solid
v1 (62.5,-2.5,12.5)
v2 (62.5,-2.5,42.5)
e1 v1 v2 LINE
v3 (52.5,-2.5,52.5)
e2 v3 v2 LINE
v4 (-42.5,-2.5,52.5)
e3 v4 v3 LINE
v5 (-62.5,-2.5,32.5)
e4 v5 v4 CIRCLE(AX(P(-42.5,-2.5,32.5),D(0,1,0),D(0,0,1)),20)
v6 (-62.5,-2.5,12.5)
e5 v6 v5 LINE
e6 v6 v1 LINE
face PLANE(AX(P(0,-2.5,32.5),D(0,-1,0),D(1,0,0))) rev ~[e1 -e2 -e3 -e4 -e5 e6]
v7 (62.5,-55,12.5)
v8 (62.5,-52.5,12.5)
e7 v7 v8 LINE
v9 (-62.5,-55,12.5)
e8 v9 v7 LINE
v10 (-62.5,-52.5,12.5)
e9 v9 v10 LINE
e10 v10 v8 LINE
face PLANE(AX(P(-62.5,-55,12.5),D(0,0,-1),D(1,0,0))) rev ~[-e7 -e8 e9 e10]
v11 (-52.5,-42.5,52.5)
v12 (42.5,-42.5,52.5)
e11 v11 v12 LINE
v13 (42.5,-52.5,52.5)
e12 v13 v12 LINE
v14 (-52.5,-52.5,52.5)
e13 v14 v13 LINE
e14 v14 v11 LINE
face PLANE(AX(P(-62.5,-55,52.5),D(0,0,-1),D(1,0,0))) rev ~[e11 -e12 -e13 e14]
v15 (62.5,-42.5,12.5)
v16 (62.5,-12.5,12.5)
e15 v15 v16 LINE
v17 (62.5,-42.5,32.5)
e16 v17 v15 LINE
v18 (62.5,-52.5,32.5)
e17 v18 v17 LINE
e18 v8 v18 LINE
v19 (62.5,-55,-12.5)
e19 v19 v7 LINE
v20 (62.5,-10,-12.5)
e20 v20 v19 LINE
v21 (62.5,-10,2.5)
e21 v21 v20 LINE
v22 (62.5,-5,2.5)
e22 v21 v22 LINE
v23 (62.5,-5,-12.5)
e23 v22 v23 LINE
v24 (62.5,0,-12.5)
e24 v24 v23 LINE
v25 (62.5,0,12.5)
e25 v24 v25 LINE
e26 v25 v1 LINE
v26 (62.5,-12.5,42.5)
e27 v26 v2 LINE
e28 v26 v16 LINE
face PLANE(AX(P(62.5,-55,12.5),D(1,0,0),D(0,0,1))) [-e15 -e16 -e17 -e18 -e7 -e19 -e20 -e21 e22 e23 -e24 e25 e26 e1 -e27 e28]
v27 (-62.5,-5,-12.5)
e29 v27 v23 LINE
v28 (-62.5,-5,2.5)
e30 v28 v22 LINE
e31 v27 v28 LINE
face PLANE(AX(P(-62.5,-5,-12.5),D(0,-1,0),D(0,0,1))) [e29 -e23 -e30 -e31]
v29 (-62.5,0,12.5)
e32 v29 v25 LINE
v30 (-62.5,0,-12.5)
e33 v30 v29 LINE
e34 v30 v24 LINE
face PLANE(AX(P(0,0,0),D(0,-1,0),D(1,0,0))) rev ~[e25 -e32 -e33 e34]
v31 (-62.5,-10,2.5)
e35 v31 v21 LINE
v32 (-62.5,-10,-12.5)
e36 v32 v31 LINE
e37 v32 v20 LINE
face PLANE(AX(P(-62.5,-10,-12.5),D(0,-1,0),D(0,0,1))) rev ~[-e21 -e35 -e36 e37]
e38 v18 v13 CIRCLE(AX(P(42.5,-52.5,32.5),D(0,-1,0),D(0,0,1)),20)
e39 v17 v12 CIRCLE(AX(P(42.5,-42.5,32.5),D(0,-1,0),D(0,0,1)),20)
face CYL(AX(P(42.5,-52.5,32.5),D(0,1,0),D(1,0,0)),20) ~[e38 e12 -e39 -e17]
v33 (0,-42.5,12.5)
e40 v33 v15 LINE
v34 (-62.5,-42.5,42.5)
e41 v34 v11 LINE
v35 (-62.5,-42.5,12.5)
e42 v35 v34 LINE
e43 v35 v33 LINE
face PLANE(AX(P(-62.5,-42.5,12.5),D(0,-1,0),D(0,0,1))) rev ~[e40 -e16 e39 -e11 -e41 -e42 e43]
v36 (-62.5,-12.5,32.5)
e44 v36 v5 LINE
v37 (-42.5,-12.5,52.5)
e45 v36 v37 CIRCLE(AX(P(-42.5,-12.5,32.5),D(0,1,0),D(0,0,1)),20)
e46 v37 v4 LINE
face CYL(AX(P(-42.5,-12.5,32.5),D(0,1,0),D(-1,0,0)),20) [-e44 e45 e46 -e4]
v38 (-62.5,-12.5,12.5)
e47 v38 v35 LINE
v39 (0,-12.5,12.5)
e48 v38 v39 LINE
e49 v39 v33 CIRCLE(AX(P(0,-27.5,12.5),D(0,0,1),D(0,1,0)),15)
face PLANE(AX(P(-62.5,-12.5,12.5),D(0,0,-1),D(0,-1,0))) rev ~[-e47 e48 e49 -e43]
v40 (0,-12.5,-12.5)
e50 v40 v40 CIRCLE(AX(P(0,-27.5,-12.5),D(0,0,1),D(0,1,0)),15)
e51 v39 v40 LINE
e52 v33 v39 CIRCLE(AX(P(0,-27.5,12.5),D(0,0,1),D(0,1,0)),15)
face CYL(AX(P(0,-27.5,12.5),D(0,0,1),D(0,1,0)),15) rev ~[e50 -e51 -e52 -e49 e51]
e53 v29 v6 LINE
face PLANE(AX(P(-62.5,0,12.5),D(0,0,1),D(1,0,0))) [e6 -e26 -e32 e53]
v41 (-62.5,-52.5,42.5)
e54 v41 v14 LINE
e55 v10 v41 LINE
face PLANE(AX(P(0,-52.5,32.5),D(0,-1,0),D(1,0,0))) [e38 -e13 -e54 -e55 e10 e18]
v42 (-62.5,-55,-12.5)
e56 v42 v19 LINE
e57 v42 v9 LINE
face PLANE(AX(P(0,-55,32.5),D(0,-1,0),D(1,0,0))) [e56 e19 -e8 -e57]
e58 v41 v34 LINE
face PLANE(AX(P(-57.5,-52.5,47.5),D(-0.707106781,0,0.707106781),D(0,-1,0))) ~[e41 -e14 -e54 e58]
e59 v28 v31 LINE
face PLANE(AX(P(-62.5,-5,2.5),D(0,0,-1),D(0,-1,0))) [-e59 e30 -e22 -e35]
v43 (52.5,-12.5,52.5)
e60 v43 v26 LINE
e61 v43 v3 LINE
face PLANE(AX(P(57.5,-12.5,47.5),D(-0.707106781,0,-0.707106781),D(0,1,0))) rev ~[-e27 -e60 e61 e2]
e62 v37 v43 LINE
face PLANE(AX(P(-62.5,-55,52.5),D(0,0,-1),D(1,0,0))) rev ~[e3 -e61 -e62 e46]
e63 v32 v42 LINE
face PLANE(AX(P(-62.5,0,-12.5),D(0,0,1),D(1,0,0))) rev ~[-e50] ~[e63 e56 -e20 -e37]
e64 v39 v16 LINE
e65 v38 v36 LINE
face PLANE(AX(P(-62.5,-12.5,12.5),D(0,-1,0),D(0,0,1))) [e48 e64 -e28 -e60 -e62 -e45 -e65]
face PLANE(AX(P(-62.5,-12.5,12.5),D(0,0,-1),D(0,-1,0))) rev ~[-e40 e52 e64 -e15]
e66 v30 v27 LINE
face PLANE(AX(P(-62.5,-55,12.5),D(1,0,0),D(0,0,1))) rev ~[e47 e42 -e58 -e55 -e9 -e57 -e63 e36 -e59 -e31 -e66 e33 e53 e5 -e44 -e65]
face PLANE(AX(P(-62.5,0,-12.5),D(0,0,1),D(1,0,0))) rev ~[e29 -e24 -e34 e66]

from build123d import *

# Parameters (mm, degrees)
F0_W      = 125
F0_H      = 25
F1_DEPTH  = 55
F2_W      = 125
F2_H      = 40
F3_DEPTH  = 52.5
F4_W      = 125
F4_H      = 40
F5_DEPTH  = 2.5
F6_W      = 30
F6_H      = 40
F7_DEPTH  = 125.001
F8_SIZE   = 10
F9_R      = 20
F10_SIZE  = 10
F11_R     = 20
F12_W     = 5
F12_H     = 15
F13_DEPTH = 125.001
F15_DEPTH = 25.001


with BuildPart() as f1:
    # F0 (on Front) → F1 (new body)
    with BuildSketch(Plane.XZ):
        Rectangle(F0_W, F0_H)
    extrude(amount=F1_DEPTH)

    # F2 (on face) → F3 (join)
    with BuildSketch(Plane.XZ.offset(55)):
        with Locations((0, 32.5)):
            Rectangle(F2_W, F2_H)
    extrude(amount=-F3_DEPTH)

    # F4 (on face) → F5 (cut)
    with BuildSketch(Plane.XZ.offset(55)):
        with Locations((0, 32.5)):
            Rectangle(F4_W, F4_H)
    extrude(amount=-F5_DEPTH, mode=Mode.SUBTRACT)

    # F6 (on face) → F7 (cut, through all)
    with BuildSketch(Plane(origin=(-62.5, 0, 0), x_dir=(0, -1, 0), z_dir=(-1, 0, 0))):
        with Locations((27.5, 32.5)):
            Rectangle(F6_W, F6_H)
    extrude(amount=-F7_DEPTH, mode=Mode.SUBTRACT)

    # F8
    f8_edges = [f1.edges().sort_by_distance(p)[0] for p in [
        (-62.5, -47.5, 52.5),
    ]]
    chamfer(f8_edges, length=F8_SIZE)

    # F9
    f9_edges = [f1.edges().sort_by_distance(p)[0] for p in [
        (-62.5, -7.5, 52.5),
    ]]
    fillet(f9_edges, radius=F9_R)

    # F10
    f10_edges = [f1.edges().sort_by_distance(p)[0] for p in [
        (62.5, -7.5, 52.5),
    ]]
    chamfer(f10_edges, length=F10_SIZE)

    # F11
    f11_edges = [f1.edges().sort_by_distance(p)[0] for p in [
        (62.5, -47.5, 52.5),
    ]]
    fillet(f11_edges, radius=F11_R)

    # F12 (on face) → F13 (cut, through all)
    with BuildSketch(Plane(origin=(-62.5, 0, 0), x_dir=(0, -1, 0), z_dir=(-1, 0, 0))):
        with Locations((7.5, -5)):
            Rectangle(F12_W, F12_H)
    extrude(amount=-F13_DEPTH, mode=Mode.SUBTRACT)

    # F14 (on face) → F15 (cut, through all)
    with BuildSketch(Plane.XY.offset(12.5)):
        with BuildLine():
            ThreePointArc((7e-10, -42.5), (10.606601718, -38.1066017176), (15, -27.5))
            ThreePointArc((15, -27.5), (10.6066017178, -16.8933982822), (0, -12.5))
            ThreePointArc((0, -12.5), (-15, -27.5000000003), (7e-10, -42.5))
        make_face()
    extrude(amount=-F15_DEPTH, mode=Mode.SUBTRACT)


solid = f1.part
